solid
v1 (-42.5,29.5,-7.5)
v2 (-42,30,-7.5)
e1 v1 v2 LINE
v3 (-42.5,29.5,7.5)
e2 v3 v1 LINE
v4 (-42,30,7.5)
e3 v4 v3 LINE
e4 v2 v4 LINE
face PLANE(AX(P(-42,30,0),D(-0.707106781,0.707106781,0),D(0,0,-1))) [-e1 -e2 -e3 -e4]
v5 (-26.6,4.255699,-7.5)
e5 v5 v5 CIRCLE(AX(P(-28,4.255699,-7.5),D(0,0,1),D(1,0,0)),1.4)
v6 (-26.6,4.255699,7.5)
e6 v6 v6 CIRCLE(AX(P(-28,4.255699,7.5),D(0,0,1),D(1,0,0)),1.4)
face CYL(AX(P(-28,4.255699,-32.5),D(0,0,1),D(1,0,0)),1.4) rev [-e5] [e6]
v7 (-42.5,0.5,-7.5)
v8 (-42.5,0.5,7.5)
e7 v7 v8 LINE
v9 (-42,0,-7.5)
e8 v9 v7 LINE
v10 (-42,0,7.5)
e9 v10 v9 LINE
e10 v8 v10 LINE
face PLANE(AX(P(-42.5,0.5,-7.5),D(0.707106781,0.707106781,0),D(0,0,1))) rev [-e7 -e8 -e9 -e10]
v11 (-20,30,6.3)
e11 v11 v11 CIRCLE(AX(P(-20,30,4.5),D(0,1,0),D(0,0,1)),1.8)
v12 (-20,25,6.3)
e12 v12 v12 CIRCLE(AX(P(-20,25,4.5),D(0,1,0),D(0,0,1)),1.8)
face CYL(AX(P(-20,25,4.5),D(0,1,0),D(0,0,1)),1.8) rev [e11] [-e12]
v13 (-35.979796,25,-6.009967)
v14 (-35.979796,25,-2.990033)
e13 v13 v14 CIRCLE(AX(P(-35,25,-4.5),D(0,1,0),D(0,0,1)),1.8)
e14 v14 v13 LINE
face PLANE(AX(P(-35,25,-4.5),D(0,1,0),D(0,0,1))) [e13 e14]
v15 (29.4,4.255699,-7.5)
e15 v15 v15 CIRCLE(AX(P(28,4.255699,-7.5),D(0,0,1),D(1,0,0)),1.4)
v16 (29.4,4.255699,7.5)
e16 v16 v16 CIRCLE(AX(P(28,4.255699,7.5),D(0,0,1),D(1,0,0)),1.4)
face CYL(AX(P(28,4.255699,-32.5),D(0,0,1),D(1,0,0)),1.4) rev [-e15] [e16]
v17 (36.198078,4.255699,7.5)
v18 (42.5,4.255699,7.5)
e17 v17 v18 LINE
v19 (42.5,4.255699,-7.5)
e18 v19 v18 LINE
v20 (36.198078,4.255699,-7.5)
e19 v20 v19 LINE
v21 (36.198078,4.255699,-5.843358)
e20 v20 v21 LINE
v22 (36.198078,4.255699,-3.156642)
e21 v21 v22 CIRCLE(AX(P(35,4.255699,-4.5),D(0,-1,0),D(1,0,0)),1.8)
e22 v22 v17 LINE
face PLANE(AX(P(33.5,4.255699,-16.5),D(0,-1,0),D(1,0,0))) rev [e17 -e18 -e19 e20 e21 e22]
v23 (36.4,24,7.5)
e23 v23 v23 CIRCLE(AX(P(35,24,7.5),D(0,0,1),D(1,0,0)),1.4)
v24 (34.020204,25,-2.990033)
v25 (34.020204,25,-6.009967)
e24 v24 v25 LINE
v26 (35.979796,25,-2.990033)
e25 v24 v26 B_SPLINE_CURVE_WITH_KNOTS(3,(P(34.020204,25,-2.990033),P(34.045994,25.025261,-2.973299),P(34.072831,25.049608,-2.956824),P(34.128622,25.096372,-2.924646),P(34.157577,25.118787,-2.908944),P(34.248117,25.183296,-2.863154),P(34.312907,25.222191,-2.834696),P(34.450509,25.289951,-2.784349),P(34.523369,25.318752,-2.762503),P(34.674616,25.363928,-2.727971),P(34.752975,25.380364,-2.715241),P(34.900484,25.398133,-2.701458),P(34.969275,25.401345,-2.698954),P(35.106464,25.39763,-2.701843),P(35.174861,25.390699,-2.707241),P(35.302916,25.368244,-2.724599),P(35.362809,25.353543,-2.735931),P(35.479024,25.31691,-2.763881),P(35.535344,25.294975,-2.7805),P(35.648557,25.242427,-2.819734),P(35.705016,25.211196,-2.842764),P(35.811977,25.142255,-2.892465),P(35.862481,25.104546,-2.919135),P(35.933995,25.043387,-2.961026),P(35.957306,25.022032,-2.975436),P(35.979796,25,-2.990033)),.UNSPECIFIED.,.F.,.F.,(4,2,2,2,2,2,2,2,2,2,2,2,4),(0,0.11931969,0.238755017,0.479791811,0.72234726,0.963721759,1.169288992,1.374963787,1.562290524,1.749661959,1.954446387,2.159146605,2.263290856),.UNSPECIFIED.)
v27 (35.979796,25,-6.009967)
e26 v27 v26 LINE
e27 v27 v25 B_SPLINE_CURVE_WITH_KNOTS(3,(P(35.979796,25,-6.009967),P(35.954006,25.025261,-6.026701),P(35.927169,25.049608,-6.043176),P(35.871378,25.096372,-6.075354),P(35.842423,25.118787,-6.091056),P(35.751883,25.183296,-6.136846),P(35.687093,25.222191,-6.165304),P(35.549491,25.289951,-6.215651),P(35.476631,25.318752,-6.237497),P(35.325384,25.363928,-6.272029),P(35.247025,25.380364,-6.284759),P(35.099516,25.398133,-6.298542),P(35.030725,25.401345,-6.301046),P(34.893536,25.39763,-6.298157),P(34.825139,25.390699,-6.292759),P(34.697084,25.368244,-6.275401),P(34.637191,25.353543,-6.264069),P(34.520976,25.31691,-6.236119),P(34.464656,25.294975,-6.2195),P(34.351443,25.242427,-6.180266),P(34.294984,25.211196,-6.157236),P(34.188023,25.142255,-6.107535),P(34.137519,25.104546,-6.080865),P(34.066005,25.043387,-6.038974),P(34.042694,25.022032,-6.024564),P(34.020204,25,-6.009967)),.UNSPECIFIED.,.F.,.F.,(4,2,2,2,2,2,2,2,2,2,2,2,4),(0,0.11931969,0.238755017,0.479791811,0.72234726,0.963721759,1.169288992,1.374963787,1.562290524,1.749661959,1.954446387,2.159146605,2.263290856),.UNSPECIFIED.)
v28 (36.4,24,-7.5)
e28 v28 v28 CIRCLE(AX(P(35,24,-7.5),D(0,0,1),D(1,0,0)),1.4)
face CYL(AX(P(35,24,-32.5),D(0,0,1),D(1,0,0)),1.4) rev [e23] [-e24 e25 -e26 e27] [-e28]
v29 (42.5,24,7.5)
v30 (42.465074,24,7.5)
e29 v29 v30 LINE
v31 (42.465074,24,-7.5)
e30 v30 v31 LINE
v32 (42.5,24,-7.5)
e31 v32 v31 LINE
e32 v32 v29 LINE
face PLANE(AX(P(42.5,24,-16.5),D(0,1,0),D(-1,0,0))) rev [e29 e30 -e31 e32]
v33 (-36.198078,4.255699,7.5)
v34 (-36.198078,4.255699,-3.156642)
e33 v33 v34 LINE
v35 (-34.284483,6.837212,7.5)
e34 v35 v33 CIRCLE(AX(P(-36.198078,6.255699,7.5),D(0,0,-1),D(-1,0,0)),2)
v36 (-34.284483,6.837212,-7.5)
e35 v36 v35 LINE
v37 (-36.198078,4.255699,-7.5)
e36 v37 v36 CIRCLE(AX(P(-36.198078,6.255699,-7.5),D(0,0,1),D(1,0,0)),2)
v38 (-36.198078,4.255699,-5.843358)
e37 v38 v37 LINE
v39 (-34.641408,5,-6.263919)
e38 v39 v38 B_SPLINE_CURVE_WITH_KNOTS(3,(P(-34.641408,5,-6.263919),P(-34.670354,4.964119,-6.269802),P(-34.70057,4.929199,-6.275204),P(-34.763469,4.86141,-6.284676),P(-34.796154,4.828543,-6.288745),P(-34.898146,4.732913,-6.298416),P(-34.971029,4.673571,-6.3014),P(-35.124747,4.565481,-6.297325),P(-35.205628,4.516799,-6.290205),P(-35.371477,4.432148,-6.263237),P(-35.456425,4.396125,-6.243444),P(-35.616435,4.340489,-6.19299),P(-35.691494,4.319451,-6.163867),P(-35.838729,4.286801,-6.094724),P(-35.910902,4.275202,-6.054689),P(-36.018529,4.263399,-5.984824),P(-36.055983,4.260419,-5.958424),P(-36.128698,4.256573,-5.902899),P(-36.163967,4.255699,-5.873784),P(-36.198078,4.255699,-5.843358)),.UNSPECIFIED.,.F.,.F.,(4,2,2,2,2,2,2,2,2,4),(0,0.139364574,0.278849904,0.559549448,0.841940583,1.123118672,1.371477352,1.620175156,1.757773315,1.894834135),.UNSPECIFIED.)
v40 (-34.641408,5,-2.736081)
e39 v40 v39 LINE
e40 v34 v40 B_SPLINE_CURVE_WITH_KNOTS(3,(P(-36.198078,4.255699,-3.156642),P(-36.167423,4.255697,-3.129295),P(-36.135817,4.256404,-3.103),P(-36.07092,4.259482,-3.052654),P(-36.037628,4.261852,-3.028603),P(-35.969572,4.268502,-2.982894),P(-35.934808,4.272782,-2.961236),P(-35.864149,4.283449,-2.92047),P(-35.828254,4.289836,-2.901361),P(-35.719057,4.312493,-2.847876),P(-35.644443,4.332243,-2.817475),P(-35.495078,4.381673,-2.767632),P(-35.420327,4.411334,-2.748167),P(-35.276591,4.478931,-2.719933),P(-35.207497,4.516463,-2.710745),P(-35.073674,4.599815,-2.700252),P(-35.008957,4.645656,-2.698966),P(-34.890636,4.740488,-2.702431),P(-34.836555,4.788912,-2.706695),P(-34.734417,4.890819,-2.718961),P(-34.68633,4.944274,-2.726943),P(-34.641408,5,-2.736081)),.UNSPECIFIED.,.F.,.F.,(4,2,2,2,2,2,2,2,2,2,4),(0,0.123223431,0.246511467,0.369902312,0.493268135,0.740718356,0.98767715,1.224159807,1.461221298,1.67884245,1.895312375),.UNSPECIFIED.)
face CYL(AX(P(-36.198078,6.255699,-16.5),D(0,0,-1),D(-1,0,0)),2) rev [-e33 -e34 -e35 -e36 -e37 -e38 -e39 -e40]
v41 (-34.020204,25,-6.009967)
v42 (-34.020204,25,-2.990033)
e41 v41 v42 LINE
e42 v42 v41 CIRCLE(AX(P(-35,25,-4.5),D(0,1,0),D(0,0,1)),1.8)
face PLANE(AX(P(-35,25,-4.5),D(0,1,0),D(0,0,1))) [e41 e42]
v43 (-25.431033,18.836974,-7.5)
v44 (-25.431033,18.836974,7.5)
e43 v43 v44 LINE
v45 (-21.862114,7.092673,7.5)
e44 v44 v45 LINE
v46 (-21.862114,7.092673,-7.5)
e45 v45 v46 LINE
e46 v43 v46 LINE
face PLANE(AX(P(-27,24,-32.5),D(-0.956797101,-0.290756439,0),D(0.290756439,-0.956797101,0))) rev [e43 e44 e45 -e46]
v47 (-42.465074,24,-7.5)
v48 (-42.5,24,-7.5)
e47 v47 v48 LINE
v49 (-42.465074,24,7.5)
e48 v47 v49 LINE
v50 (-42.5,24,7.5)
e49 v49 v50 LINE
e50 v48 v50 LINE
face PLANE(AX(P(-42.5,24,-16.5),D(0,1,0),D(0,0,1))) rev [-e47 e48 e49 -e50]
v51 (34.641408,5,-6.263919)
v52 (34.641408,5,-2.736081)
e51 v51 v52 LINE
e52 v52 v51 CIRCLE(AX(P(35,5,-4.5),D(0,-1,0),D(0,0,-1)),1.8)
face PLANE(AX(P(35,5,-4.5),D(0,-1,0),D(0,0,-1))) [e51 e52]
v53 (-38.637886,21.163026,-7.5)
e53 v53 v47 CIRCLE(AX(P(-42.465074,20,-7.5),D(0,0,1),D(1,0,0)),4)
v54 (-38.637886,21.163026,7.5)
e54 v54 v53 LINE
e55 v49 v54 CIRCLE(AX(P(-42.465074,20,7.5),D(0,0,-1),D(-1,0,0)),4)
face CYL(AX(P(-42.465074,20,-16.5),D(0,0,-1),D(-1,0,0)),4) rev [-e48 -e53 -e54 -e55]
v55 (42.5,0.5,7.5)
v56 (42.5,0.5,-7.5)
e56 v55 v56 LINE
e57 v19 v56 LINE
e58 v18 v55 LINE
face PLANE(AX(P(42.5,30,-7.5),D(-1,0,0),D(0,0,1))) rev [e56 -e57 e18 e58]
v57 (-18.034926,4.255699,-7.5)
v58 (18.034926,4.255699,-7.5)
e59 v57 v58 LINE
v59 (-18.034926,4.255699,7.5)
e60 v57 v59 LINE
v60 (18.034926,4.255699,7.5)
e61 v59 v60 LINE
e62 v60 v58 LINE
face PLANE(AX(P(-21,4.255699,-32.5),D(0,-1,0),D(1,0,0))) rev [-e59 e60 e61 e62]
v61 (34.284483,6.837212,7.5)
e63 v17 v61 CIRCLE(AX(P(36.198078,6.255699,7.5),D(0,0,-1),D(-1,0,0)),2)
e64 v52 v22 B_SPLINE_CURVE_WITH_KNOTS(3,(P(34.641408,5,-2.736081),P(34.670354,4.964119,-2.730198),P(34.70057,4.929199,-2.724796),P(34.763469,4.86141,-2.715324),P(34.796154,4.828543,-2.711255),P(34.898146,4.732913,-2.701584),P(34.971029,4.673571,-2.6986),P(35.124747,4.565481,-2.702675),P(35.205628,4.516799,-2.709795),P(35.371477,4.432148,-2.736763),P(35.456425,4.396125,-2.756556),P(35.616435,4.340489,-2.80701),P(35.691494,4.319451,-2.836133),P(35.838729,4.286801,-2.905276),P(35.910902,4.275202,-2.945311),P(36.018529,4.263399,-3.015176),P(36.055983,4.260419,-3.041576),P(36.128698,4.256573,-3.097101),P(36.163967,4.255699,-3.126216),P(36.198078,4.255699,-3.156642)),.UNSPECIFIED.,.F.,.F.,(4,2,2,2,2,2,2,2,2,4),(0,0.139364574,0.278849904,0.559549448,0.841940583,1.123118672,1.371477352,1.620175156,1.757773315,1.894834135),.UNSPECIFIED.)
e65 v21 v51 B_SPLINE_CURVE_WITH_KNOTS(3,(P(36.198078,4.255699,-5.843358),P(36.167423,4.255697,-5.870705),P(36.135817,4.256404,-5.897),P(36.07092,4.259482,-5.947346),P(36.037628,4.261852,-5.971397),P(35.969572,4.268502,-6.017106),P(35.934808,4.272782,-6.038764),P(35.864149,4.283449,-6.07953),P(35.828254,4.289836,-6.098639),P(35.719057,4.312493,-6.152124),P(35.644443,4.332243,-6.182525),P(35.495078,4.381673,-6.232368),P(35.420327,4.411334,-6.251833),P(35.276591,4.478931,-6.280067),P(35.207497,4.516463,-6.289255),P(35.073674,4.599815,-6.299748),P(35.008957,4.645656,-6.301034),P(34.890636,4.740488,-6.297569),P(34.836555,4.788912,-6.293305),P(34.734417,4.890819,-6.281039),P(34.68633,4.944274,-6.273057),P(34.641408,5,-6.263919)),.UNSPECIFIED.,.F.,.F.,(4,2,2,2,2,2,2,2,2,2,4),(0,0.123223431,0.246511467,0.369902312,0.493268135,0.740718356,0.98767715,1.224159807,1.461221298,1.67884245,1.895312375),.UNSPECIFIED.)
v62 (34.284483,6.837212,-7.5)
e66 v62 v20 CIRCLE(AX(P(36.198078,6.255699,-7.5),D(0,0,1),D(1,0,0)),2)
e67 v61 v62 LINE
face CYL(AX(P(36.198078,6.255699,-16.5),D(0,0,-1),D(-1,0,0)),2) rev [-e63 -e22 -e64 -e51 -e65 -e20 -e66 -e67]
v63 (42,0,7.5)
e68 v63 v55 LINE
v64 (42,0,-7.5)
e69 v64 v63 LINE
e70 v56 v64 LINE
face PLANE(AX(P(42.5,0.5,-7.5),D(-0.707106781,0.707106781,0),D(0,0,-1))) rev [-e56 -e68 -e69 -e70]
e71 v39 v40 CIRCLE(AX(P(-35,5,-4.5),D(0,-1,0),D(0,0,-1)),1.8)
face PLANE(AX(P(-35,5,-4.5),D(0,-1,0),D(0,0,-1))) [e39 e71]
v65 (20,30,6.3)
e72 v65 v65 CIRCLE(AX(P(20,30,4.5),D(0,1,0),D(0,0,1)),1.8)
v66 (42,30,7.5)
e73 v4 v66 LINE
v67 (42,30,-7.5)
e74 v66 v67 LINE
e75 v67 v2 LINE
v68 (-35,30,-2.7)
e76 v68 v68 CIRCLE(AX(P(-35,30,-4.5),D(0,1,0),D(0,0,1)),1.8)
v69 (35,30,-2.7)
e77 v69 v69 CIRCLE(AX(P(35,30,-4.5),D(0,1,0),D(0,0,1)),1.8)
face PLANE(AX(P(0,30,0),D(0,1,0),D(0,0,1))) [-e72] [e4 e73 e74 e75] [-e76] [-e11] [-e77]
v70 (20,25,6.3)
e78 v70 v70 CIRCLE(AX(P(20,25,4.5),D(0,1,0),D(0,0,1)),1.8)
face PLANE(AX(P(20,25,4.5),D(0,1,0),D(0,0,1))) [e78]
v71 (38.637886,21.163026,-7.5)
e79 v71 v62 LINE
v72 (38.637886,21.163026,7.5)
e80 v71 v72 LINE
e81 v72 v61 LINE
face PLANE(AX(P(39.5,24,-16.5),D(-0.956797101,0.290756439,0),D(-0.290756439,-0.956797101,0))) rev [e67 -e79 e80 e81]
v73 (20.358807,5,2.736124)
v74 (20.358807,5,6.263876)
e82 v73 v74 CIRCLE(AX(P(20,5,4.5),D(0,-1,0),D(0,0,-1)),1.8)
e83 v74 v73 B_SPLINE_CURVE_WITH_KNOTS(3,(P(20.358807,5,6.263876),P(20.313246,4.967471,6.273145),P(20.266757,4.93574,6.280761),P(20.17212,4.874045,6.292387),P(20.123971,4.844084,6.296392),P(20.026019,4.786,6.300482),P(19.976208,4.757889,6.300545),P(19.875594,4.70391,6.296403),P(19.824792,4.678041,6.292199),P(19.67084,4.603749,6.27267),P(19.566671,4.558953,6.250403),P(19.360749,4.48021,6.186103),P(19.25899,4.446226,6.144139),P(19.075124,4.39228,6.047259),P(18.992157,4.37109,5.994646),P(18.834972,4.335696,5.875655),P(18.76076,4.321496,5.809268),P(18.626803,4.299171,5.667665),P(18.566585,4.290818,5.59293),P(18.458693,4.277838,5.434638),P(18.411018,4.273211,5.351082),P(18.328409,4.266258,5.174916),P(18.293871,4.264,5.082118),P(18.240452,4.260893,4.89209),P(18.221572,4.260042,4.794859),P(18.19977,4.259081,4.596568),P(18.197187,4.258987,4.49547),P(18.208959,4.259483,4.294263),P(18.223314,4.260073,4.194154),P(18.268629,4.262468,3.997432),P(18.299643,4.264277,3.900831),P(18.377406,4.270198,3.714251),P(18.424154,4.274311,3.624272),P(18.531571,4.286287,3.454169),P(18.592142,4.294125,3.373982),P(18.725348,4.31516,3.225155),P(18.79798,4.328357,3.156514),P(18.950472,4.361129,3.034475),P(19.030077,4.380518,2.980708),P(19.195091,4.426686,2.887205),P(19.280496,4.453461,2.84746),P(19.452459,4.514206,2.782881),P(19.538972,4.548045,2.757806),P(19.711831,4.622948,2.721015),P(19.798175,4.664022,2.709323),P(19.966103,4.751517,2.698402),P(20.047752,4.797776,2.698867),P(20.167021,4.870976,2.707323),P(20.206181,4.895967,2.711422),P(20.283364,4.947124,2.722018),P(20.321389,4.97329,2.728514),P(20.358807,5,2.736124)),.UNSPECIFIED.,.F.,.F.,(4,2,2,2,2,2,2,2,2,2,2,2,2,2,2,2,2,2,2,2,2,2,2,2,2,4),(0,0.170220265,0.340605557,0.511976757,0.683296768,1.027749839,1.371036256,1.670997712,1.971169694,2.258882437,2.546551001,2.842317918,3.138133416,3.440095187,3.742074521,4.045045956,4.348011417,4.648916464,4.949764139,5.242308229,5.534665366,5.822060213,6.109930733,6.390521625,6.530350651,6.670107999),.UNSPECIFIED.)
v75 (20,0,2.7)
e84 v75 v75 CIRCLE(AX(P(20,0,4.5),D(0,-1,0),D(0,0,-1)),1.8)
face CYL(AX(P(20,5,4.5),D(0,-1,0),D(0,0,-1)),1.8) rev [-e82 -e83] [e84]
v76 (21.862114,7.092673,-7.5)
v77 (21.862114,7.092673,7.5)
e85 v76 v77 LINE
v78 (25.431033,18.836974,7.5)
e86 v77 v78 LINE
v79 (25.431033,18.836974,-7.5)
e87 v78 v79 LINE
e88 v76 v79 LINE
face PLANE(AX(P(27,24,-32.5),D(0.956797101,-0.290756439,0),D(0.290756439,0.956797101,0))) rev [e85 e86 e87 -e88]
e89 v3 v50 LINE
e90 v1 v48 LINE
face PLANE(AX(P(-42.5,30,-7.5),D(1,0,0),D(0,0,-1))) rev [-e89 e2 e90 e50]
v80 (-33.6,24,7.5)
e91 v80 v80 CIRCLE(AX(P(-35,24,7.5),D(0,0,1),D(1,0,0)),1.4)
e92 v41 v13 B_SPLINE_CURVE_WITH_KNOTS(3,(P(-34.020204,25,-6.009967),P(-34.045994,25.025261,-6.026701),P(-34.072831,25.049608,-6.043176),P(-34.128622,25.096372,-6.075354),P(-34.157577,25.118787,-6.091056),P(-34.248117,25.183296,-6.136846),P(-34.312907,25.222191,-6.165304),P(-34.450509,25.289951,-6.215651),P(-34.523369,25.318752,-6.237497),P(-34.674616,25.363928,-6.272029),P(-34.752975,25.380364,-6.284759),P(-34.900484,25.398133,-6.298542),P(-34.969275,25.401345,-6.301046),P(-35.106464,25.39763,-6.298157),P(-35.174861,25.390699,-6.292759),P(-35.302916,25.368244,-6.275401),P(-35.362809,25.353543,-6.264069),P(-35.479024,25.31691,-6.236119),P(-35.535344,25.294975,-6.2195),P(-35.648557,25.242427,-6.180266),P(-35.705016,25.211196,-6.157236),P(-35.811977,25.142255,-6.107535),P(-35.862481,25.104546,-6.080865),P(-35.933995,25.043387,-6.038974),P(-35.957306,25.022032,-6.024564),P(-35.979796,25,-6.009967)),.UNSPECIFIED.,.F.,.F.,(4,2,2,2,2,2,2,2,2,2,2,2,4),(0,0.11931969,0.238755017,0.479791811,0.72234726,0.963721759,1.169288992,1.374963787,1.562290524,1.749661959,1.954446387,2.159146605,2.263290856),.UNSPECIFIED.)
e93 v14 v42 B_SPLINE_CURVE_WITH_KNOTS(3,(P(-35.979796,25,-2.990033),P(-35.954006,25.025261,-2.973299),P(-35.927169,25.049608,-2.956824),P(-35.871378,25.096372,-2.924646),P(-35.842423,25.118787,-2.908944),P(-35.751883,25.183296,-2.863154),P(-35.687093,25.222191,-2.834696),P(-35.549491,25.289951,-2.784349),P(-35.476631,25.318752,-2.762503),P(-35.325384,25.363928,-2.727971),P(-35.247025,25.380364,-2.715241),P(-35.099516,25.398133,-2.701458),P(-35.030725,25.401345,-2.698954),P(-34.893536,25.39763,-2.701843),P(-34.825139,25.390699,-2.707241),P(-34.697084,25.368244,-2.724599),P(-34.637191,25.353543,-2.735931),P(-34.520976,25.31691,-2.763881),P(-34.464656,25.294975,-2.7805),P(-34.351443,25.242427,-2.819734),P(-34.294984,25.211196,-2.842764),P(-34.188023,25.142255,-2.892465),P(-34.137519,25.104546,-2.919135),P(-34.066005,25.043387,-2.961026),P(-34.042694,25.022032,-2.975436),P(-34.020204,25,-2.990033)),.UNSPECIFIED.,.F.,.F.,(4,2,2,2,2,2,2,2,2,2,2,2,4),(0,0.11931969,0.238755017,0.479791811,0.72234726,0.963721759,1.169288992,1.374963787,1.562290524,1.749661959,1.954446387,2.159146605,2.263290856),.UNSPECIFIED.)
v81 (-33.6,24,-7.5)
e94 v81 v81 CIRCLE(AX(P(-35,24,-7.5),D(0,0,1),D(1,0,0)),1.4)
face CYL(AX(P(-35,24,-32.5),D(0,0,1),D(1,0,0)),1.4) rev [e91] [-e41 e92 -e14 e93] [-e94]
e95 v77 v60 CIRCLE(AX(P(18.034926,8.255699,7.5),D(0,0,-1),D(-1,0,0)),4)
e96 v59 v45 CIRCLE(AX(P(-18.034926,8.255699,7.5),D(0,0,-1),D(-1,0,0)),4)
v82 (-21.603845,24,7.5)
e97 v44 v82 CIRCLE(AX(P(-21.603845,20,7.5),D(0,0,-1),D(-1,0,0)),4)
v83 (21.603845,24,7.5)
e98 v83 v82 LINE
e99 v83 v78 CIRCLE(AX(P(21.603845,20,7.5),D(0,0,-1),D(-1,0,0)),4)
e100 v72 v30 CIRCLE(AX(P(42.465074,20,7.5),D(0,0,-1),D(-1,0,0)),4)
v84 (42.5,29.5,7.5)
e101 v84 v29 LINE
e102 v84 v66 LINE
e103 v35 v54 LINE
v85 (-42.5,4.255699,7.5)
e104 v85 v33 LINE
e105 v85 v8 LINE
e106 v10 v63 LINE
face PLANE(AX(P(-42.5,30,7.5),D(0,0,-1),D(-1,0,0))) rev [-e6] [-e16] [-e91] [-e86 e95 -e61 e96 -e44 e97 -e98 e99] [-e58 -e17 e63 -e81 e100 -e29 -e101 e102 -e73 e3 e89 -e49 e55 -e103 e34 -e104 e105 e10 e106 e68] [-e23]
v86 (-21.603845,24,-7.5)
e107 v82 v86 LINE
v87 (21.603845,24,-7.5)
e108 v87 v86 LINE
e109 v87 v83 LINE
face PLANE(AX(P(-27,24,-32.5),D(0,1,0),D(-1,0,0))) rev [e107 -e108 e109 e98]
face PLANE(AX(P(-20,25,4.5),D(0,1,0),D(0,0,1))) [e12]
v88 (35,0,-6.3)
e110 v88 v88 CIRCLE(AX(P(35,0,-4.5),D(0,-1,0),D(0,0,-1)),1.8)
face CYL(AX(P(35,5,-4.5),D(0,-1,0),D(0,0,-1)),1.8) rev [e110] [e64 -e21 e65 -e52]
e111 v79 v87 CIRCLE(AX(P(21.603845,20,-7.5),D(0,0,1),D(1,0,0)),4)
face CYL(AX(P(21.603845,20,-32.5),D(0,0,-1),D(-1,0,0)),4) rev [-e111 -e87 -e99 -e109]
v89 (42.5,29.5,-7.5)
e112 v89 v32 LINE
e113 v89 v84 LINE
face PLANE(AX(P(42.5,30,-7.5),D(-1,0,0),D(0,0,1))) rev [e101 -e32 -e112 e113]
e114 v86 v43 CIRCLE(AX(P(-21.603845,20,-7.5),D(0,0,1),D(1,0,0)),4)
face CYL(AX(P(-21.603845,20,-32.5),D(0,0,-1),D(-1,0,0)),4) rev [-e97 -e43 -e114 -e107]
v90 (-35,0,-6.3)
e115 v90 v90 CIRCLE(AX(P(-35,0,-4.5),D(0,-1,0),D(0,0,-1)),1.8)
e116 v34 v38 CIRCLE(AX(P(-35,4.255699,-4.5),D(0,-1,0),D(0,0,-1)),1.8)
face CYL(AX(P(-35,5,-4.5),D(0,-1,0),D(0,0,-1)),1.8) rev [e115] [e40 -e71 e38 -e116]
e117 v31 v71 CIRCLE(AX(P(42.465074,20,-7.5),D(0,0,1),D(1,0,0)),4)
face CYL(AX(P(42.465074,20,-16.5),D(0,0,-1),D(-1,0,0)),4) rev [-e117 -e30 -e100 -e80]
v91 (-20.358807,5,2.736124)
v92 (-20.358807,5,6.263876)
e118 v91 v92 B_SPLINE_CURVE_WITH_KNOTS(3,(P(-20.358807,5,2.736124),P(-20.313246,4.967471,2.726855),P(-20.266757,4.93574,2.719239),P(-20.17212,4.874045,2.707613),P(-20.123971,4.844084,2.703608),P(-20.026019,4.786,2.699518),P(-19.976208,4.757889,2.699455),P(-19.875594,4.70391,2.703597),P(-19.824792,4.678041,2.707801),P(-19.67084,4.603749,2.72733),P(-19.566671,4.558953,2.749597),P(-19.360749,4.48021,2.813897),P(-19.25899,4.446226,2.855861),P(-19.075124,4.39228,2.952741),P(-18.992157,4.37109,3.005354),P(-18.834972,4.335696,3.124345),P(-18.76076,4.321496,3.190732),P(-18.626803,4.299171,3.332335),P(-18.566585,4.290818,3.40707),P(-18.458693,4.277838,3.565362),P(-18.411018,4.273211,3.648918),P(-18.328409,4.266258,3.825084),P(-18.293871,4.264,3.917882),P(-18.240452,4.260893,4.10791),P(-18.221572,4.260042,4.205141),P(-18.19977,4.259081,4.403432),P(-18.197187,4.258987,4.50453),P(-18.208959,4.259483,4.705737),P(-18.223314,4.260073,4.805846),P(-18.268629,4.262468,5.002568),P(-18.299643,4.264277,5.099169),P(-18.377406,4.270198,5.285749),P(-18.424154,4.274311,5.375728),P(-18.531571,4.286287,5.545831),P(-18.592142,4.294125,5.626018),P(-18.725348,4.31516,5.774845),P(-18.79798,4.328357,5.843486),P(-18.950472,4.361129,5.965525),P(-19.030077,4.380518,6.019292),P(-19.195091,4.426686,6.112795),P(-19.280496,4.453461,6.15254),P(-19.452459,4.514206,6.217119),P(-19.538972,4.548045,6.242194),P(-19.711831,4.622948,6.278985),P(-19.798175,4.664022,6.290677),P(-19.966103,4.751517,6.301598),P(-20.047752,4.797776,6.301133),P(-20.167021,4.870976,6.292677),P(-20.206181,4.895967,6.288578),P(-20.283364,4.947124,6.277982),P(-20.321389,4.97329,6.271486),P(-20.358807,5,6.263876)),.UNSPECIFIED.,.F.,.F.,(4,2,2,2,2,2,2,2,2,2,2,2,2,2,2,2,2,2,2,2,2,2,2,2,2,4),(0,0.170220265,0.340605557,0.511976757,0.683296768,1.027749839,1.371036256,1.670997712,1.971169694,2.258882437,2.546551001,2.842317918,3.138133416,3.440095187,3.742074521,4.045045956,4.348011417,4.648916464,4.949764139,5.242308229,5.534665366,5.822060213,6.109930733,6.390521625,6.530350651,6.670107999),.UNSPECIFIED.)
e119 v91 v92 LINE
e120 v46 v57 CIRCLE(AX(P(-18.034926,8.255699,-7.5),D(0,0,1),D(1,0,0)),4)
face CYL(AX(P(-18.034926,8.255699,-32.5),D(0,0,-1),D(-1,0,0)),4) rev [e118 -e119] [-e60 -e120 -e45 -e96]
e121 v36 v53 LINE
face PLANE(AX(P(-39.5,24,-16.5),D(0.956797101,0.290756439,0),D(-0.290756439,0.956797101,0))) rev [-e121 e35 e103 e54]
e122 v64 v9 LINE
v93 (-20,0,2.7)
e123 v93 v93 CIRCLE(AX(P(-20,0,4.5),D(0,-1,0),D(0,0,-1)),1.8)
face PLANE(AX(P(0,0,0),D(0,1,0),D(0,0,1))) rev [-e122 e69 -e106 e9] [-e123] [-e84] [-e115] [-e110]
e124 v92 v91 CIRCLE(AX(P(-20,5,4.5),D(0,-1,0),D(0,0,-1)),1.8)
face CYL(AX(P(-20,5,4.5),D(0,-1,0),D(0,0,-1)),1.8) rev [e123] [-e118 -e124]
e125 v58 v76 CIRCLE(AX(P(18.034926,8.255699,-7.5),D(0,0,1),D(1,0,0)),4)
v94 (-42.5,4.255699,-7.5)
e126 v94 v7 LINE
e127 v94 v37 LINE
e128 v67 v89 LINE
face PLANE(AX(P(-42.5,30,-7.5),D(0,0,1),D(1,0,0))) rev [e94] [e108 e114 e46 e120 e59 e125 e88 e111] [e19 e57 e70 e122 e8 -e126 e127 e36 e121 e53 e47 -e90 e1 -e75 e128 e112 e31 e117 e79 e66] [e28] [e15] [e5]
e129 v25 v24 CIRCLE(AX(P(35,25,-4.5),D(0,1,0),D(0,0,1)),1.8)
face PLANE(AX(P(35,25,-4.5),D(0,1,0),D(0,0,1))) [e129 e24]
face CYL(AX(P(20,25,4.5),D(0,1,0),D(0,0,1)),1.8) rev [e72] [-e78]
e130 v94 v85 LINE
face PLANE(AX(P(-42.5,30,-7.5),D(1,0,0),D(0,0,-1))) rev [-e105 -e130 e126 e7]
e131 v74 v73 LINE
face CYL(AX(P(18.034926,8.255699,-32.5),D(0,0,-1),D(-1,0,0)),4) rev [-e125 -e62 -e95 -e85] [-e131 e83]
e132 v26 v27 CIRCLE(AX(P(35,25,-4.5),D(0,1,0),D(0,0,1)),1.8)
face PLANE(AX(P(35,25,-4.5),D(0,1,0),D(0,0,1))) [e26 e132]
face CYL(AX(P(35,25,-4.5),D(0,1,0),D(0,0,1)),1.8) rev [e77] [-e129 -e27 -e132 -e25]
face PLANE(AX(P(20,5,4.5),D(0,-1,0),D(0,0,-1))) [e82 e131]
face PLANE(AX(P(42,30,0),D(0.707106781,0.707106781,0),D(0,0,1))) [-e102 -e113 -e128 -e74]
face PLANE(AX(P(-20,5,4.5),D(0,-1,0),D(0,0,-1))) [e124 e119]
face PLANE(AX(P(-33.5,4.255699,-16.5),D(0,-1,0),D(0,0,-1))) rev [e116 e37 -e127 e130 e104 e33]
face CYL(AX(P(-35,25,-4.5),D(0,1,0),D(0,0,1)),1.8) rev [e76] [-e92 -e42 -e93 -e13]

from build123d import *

# Parameters (mm, degrees)
SKETCH_1_W          = 85
SKETCH_1_H          = 15
EXTRUDE_1_DEPTH     = 30
SKETCH_2_R          = 1.4
CUT_EXTRUDE_1_DEPTH = 40
CUT_EXTRUDE_2_DEPTH = 40
FILLET_1_R          = 4
SKETCH_5_R          = 1.8
CUT_EXTRUDE_3_DEPTH = 5
CHAMFER_1_SIZE      = 0.5
CUT_EXTRUDE_4_DEPTH = 24
FILLET_3_R          = 4
CUT_EXTRUDE_START   = -5
SKETCH_9_R          = 1.8
CUT_EXTRUDE_5_DEPTH = 5
FILLET_4_R          = 2


with BuildPart() as part:
    # 草图1 → 凸台-拉伸1 (new body)
    with BuildSketch(Plane(origin=(0, 0, 0), x_dir=(1, 0, 0), z_dir=(0, 1, 0))):
        Rectangle(SKETCH_1_W, SKETCH_1_H)
    extrude(amount=EXTRUDE_1_DEPTH)

    # 草图2 → 切除-拉伸1 (cut)
    with BuildSketch(Plane.XY.offset(7.5)):
        with Locations((-35, 24)):
            Circle(SKETCH_2_R)
        with Locations((35, 24)):
            Circle(SKETCH_2_R)
        with Locations((28, 4.255699158)):
            Circle(SKETCH_2_R)
        with Locations((-28, 4.255699158)):
            Circle(SKETCH_2_R)
    extrude(amount=-CUT_EXTRUDE_1_DEPTH, mode=Mode.SUBTRACT)

    # 草图3 → 切除-拉伸2 (cut)
    with BuildSketch(Plane.XY.offset(7.5)):
        Polygon((-27, 24), (27, 24), (21, 4.255699158), (-21, 4.255699158), align=None)
    extrude(amount=-CUT_EXTRUDE_2_DEPTH, mode=Mode.SUBTRACT)

    # 圆角1
    fillet_1_edges = [part.edges().sort_by_distance(p)[0] for p in [
        (-21, 4.255699158, 0),
        (-27, 24, 0),
        (27, 24, 0),
        (21, 4.255699158, 0),
    ]]
    fillet(fillet_1_edges, radius=FILLET_1_R)

    # 草图5 → 切除-拉伸3 (cut)
    with BuildSketch(Plane(origin=(0, 30, 0), x_dir=(1, 0, 0), z_dir=(0, 1, 0))):
        with Locations(Location((-35, 4.5, 0), (0, 0, 270))):
            Circle(SKETCH_5_R)
        with Locations(Location((35, 4.5, 0), (0, 0, 270))):
            Circle(SKETCH_5_R)
        with Locations(Location((-20, -4.5, 0), (0, 0, 270))):
            Circle(SKETCH_5_R)
        with Locations(Location((20, -4.5, 0), (0, 0, 270))):
            Circle(SKETCH_5_R)
    extrude(amount=-CUT_EXTRUDE_3_DEPTH, mode=Mode.SUBTRACT)

    # 倒角1
    chamfer_1_edges = [part.edges().sort_by_distance(p)[0] for p in [
        (-42.5, 30, 0),
        (42.5, 30, 0),
        (-42.5, 0, 0),
        (42.5, 0, 0),
    ]]
    chamfer(chamfer_1_edges, length=CHAMFER_1_SIZE)

    # 草图6 → 切除-拉伸4 (cut)
    with BuildSketch(Plane.XY.offset(7.5)):
        Polygon((-42.5, 24), (-39.5, 24), (-33.5, 4.255699158), (-42.5, 4.255699158), align=None)
        Polygon((42.5, 24), (42.5, 4.255699158), (33.5, 4.255699158), (39.5, 24), align=None)
    extrude(amount=-CUT_EXTRUDE_4_DEPTH, mode=Mode.SUBTRACT)

    # 圆角3
    fillet_3_edges = [part.edges().sort_by_distance(p)[0] for p in [
        (-39.5, 24, 0),
        (39.5, 24, 0),
    ]]
    fillet(fillet_3_edges, radius=FILLET_3_R)

    # 草图9 → 切除-拉伸5 (cut)
    with BuildSketch(Plane.XZ.offset(CUT_EXTRUDE_START)):
        with Locations(Location((20, 4.5, 0), (0, 0, 90))):
            Circle(SKETCH_9_R)
        with Locations(Location((-20, 4.5, 0), (0, 0, 90))):
            Circle(SKETCH_9_R)
        with Locations(Location((-35, -4.5, 0), (0, 0, 90))):
            Circle(SKETCH_9_R)
        with Locations(Location((35, -4.5, 0), (0, 0, 90))):
            Circle(SKETCH_9_R)
    extrude(amount=CUT_EXTRUDE_5_DEPTH, mode=Mode.SUBTRACT)

    # 圆角4
    # the kernel refuses this fillet: 2 mm, written as the material it adds along each edge
    with BuildSketch(Plane(origin=(-33.5, 4.255699158, 7.5), x_dir=(-1, 0, 0), z_dir=(0, 0, -1))) as fillet_4_piece_1_section:
        with BuildLine():
            CenterArc((FILLET_4_R * 1.34903882702, FILLET_4_R), FILLET_4_R, 163.096751643, 106.903248357)
            Line((FILLET_4_R * 0.392241725729, FILLET_4_R * 1.29075643923), (0, 0))
            Line((0, 0), (FILLET_4_R * 1.34903882702, 0))
        make_face()
    fillet_4_piece_1 = extrude(amount=17.750206698, mode=Mode.PRIVATE)
    fillet_4_piece_1 = split(fillet_4_piece_1, bisect_by=Plane(origin=(-34.397620366, 4.568933738, -7.5), z_dir=(0, 0, 1)), keep=Keep.TOP, mode=Mode.PRIVATE)
    fillet_4_piece_1 = fillet_4_piece_1 - Plane(origin=(-35, 4.568933738, -4.5), x_dir=(0, 0, 1), z_dir=(0, 1, 0)) * Cylinder(1.8, 47, mode=Mode.PRIVATE)
    add(fillet_4_piece_1)
    with BuildSketch(Plane(origin=(-33.5, 4.255699158, 7.5), x_dir=(-1, 0, 0), z_dir=(0, 0, -1))) as fillet_4_piece_2_section:
        with BuildLine():
            CenterArc((FILLET_4_R * 1.34903882702, FILLET_4_R), FILLET_4_R, 163.096751643, 106.903248357)
            Line((FILLET_4_R * 0.392241725729, FILLET_4_R * 1.29075643923), (0, 0))
            Line((0, 0), (FILLET_4_R * 1.34903882702, 0))
        make_face()
    fillet_4_piece_2 = extrude(amount=17.750206698, mode=Mode.PRIVATE)
    fillet_4_piece_2 = split(fillet_4_piece_2, bisect_by=Plane(origin=(-34.145110505, 5.458310784, -7.5), z_dir=(0, 0, 1)), keep=Keep.TOP, mode=Mode.PRIVATE)
    fillet_4_piece_2 = split(fillet_4_piece_2, bisect_by=Plane(origin=(-34.145110505, 5, -4.499999953), z_dir=(0, 1, 0)), keep=Keep.TOP, mode=Mode.PRIVATE)
    add(fillet_4_piece_2)
    with BuildSketch(Plane(origin=(33.5, 4.255699158, 7.5), x_dir=(0.2907564392301515, 0.9567971012948373, 0), z_dir=(0, 0, -1))) as fillet_4_piece_3_section:
        with BuildLine():
            CenterArc((FILLET_4_R * 1.34903882702, FILLET_4_R), FILLET_4_R, 163.096751643, 106.903248357)
            Line((FILLET_4_R * 0.392241725729, FILLET_4_R * 1.29075643923), (0, 0))
            Line((0, 0), (FILLET_4_R * 1.34903882702, 0))
        make_face()
    fillet_4_piece_3 = extrude(amount=17.750206698, mode=Mode.PRIVATE)
    fillet_4_piece_3 = split(fillet_4_piece_3, bisect_by=Plane(origin=(34.133275605, 5.45760424, -7.5), z_dir=(0, 0, 1)), keep=Keep.TOP, mode=Mode.PRIVATE)
    fillet_4_piece_3 = fillet_4_piece_3 - Plane(origin=(35, 5.45760424, -4.5), x_dir=(0, 0, 1), z_dir=(0, 1, 0)) * Cylinder(1.8, 47, mode=Mode.PRIVATE)
    add(fillet_4_piece_3)
    with BuildSketch(Plane(origin=(33.5, 4.255699158, 7.5), x_dir=(0.2907564392301515, 0.9567971012948373, 0), z_dir=(0, 0, -1))) as fillet_4_piece_4_section:
        with BuildLine():
            CenterArc((FILLET_4_R * 1.34903882702, FILLET_4_R), FILLET_4_R, 163.096751643, 106.903248357)
            Line((FILLET_4_R * 0.392241725729, FILLET_4_R * 1.29075643923), (0, 0))
            Line((0, 0), (FILLET_4_R * 1.34903882702, 0))
        make_face()
    fillet_4_piece_4 = extrude(amount=17.750206698, mode=Mode.PRIVATE)
    fillet_4_piece_4 = split(fillet_4_piece_4, bisect_by=Plane(origin=(34.145110504, 5.458310885, -7.5), z_dir=(0, 0, 1)), keep=Keep.TOP, mode=Mode.PRIVATE)
    fillet_4_piece_4 = split(fillet_4_piece_4, bisect_by=Plane(origin=(34.145110504, 5, -4.499999944), z_dir=(0, 1, 0)), keep=Keep.TOP, mode=Mode.PRIVATE)
    add(fillet_4_piece_4)


solid = part.part
